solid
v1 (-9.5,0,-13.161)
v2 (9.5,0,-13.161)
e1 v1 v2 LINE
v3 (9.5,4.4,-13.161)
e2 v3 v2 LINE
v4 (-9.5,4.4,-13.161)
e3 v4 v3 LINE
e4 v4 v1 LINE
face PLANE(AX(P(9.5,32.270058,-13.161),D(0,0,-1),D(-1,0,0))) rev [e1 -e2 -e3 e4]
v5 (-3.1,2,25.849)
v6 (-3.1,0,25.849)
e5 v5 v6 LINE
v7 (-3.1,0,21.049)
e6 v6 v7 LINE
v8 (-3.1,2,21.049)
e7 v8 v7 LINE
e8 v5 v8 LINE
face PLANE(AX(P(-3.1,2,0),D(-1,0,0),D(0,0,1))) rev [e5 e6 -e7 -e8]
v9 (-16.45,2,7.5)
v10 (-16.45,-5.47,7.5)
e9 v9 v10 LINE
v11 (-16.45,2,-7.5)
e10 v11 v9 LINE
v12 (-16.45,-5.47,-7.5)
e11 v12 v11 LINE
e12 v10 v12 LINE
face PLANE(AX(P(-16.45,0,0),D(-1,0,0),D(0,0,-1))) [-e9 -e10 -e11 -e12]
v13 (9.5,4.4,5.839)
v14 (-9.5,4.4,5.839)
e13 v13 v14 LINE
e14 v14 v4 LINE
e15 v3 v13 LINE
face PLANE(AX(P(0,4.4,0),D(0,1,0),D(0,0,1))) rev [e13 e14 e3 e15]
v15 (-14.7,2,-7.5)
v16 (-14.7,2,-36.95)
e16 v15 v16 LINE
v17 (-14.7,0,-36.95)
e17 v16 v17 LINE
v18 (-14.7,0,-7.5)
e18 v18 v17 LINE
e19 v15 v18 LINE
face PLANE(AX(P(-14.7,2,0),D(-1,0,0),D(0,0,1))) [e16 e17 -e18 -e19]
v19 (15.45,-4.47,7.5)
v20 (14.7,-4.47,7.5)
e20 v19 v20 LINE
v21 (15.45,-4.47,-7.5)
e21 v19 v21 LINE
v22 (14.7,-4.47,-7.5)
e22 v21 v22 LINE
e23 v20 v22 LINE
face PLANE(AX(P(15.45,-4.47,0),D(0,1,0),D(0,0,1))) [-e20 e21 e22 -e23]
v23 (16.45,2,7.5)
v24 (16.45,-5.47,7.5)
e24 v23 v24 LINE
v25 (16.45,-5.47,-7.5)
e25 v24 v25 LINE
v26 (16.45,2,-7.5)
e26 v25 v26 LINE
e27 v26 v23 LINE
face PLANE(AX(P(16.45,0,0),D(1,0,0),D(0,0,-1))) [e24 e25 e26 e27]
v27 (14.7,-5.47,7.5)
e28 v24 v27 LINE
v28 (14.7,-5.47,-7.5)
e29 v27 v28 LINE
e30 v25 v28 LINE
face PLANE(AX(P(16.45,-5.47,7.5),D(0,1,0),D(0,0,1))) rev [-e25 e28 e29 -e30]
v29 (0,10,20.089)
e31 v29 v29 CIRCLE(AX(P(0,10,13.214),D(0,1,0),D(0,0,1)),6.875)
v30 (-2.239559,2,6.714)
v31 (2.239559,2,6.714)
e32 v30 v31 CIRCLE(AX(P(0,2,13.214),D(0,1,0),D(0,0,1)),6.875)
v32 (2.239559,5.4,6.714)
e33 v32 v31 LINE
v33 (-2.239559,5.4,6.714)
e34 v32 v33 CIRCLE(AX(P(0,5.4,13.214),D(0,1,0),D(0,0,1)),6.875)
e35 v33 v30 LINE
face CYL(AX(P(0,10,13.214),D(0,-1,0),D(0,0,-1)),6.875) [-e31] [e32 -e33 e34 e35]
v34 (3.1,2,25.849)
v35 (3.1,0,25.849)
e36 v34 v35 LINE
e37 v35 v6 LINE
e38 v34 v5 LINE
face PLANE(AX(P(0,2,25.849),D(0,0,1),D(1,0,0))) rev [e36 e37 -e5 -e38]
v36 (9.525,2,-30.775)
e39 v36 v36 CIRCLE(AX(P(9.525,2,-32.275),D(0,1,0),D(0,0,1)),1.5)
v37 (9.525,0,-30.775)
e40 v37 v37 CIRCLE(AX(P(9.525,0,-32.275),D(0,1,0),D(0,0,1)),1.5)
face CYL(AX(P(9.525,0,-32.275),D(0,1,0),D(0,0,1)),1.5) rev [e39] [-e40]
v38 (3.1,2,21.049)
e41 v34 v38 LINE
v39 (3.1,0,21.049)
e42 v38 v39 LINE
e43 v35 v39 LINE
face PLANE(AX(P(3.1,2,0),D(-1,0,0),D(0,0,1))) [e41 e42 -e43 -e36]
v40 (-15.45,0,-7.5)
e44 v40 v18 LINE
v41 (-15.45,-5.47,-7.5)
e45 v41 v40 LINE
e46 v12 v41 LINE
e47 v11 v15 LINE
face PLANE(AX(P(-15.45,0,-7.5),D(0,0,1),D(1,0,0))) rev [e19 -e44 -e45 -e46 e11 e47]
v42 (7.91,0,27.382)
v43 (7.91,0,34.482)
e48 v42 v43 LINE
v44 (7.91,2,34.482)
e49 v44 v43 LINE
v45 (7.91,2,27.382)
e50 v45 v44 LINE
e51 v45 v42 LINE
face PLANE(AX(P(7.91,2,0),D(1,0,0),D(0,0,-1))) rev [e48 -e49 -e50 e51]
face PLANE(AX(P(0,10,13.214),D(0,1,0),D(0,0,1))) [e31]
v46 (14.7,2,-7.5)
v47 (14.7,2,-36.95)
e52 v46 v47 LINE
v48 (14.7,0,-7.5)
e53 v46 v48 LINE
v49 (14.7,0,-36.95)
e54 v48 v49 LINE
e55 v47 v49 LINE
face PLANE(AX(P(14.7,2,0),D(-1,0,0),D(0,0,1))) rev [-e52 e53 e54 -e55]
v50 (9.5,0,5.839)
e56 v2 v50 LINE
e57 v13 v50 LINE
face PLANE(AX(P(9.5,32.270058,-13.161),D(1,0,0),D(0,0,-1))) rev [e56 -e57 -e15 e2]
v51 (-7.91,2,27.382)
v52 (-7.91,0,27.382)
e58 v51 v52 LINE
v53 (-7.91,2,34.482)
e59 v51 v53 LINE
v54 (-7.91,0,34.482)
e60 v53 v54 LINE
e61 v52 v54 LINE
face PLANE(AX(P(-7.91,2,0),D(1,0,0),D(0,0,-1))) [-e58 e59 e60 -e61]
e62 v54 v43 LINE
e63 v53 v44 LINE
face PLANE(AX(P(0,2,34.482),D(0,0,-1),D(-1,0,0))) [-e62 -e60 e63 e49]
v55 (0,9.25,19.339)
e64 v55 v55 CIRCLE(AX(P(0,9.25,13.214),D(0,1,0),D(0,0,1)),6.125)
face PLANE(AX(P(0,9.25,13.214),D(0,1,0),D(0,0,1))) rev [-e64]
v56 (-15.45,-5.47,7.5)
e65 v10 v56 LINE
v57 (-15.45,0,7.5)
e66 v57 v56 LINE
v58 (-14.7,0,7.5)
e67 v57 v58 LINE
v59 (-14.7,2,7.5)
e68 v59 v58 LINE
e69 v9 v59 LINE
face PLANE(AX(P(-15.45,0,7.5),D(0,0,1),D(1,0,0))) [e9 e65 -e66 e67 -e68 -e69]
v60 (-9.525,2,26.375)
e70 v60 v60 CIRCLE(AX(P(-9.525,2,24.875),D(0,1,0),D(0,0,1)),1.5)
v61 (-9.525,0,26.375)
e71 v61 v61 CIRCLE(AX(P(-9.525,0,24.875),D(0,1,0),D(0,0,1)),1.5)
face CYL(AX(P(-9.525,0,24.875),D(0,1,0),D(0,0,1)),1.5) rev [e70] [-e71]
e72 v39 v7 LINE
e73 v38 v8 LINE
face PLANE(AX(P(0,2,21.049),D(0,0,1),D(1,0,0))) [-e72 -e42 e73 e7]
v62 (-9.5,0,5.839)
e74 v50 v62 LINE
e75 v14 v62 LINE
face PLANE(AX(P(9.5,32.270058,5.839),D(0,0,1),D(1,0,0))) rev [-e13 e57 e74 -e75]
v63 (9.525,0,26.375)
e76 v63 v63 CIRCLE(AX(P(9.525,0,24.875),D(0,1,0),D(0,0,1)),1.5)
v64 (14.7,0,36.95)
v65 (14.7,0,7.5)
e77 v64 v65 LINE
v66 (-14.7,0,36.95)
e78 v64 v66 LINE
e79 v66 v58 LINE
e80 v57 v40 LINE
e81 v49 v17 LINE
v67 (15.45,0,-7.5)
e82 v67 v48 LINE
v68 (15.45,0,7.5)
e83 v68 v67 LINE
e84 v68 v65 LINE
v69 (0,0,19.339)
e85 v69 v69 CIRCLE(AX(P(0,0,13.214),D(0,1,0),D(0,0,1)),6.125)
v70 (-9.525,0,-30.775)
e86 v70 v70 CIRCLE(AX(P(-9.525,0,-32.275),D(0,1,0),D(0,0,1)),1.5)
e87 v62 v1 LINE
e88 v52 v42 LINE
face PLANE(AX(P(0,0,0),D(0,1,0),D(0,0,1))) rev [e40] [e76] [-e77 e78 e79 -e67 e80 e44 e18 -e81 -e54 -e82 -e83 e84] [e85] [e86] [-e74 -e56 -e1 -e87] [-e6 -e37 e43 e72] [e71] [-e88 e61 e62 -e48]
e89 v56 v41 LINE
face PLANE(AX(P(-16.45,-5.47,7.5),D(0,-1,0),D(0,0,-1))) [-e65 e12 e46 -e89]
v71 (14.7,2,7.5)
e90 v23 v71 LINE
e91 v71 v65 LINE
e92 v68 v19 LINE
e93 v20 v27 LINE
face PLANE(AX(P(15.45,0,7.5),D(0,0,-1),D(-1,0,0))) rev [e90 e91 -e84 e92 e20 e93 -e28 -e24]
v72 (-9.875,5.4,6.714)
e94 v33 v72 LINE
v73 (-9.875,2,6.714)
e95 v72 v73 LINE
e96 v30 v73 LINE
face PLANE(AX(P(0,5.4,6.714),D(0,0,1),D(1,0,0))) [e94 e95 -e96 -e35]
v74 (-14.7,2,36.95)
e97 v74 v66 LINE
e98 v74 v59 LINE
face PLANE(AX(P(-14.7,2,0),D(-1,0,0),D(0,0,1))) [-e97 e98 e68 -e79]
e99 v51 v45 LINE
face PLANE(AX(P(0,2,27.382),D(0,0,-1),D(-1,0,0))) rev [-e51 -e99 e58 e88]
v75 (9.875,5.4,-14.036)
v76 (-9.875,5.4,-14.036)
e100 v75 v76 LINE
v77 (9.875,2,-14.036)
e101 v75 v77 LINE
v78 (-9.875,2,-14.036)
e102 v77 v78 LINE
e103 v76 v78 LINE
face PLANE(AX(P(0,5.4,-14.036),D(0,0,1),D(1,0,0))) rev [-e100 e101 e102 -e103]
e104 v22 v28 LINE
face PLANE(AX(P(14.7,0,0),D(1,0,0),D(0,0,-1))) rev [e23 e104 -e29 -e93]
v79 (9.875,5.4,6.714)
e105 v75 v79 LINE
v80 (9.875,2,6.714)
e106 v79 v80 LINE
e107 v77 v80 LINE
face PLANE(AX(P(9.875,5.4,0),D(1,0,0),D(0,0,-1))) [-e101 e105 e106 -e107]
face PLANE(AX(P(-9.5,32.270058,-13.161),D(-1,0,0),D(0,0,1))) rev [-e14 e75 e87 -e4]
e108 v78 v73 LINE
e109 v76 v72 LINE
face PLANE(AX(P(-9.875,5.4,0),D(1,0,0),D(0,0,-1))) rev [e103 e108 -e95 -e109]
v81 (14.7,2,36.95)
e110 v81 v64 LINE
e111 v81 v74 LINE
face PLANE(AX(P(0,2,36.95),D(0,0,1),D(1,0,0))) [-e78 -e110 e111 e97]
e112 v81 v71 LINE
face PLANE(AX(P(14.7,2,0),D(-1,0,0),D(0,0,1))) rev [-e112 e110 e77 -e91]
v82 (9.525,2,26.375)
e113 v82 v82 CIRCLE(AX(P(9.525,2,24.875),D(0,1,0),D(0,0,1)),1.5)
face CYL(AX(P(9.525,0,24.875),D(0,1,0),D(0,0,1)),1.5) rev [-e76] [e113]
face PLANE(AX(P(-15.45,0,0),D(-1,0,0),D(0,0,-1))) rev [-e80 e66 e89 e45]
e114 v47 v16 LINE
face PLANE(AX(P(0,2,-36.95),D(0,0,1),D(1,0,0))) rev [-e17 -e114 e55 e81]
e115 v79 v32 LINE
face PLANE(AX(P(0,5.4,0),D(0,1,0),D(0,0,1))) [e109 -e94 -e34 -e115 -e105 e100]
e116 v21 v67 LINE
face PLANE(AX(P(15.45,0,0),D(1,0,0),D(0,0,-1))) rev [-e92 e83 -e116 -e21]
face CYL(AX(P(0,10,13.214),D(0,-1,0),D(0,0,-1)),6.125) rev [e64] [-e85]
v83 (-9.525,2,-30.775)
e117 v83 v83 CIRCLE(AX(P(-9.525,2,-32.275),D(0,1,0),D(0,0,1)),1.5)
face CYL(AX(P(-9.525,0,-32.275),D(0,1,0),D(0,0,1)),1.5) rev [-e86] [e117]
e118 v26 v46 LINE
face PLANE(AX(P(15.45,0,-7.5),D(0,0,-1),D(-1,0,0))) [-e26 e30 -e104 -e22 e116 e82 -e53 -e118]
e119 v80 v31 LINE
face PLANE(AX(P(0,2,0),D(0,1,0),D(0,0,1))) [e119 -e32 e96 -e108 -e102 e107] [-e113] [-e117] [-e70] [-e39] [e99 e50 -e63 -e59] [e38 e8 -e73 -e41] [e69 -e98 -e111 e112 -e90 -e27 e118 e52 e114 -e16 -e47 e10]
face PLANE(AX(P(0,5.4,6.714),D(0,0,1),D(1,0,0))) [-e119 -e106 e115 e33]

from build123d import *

# Parameters (mm, degrees)
SKETCH1_W               = 29.4
SKETCH1_H               = 73.9
SKETCH1_W_2             = 15.82
SKETCH1_H_2             = 7.1
SKETCH1_W_3             = 6.2
SKETCH1_H_3             = 4.8
BOSS_EXTRUDE1_DEPTH     = 2
SKETCH1_3_R             = 6.875
BOSS_EXTRUDE2_DEPTH     = 10
SHELL1_T                = -0.75
SKETCH1_4_W             = 19.75
SKETCH1_4_H             = 20.75
BOSS_EXTRUDE3_DEPTH     = 5.4
SKETCH2_W               = 19
SKETCH2_H               = 19
CUT_EXTRUDE1_DEPTH      = 4.4
CUT_EXTRUDE2_DEPTH      = 41.563437971
CUT_EXTRUDE2_DEPTH_BACK = 41.563437971
SKETCH5_W               = 15
SKETCH5_H               = 1
SKETCH5_W_2             = 7.5
SKETCH5_H_2             = 2
BOSS_EXTRUDE4_DEPTH     = 0.75
SKETCH6_W               = 15
SKETCH6_H               = 7.47
BOSS_EXTRUDE5_DEPTH     = 1
MIRROR1_START           = -7.5
MIRROR1_DEPTH           = 15


# Read off the part's stored shape, not the designer's step: Mirror1
with BuildPart() as part:
    # Sketch1 → Boss-Extrude1 (new body)
    with BuildSketch(Plane(origin=(0, 0, 0), x_dir=(1, 0, 0), z_dir=(0, 1, 0))):
        Rectangle(SKETCH1_W, SKETCH1_H)
        with Locations((0, -30.932)):
            Rectangle(SKETCH1_W_2, SKETCH1_H_2, mode=Mode.SUBTRACT)
        with Locations((0, -23.449)):
            Rectangle(SKETCH1_W_3, SKETCH1_H_3, mode=Mode.SUBTRACT)
        with BuildLine():
            Line((-9.875, 14.036), (9.875, 14.036))
            Line((9.875, 14.036), (9.875, -6.714))
            Line((9.875, -6.714), (2.239559108, -6.714))
            ThreePointArc((2.239559108, -6.714), (0, -20.089), (-2.239559108, -6.714))
            Line((-2.239559108, -6.714), (-9.875, -6.714))
            Line((-9.875, -6.714), (-9.875, 14.036))
        make_face(mode=Mode.SUBTRACT)
    extrude(amount=BOSS_EXTRUDE1_DEPTH)



with BuildPart() as body_2:
    # Sketch1<3> → Boss-Extrude2 (new body)
    with BuildSketch(Plane(origin=(0, 0, 0), x_dir=(1, 0, 0), z_dir=(0, 1, 0))):
        with Locations(Location((0, -13.214, 0), (0, 0, 270))):
            Circle(SKETCH1_3_R)
    extrude(amount=BOSS_EXTRUDE2_DEPTH)

    # Shell1
    shell1_openings = [body_2.faces().sort_by_distance(p)[0] for p in [
        (0, 0, 13.214),
    ]]
    offset(amount=SHELL1_T, openings=shell1_openings, kind=Kind.INTERSECTION)


with BuildPart() as part_1:
    add(part.part)

    add(body_2.part)  # Boss-Extrude3 merges body 2
    # Sketch1<4> → Boss-Extrude3 (add)
    with BuildSketch(Plane(origin=(0, 0, 0), x_dir=(1, 0, 0), z_dir=(0, 1, 0))):
        with Locations((0, 3.661)):
            Rectangle(SKETCH1_4_W, SKETCH1_4_H)
    extrude(amount=BOSS_EXTRUDE3_DEPTH)

    # Sketch2 → Cut-Extrude1 (cut)
    with BuildSketch(Plane.XZ):
        with Locations((0, -3.661)):
            Rectangle(SKETCH2_W, SKETCH2_H)
    extrude(amount=-CUT_EXTRUDE1_DEPTH, mode=Mode.SUBTRACT)

    # Sketch3 → Cut-Extrude2 (cut, two sides: drawn at the far end of the back side and taken through both)
    with BuildSketch(Plane(origin=(0, 2, 0), x_dir=(1, 0, 0), z_dir=(0, 1, 0)).offset(-CUT_EXTRUDE2_DEPTH_BACK)):
        with BuildLine():
            Line((-9.525, 30.775), (-9.525, 32.275))
            Line((-9.525, 32.275), (-8.025, 32.275))
            ThreePointArc((-8.025, 32.275), (-10.585660172, 33.335660172), (-9.525, 30.775))
        make_face()
        with BuildLine():
            Line((-8.025, 32.275), (-9.525, 32.275))
            Line((-9.525, 32.275), (-9.525, 30.775))
            ThreePointArc((-9.525, 30.775), (-8.464339828, 31.214339828), (-8.025, 32.275))
        make_face()
        with BuildLine():
            ThreePointArc((11.025, 32.275), (9.525, 33.775), (8.025, 32.275))
            Line((8.025, 32.275), (9.525, 32.275))
            Line((9.525, 32.275), (9.525, 30.775))
            ThreePointArc((9.525, 30.775), (10.585660172, 31.214339828), (11.025, 32.275))
        make_face()
        with BuildLine():
            Line((9.525, 32.275), (8.025, 32.275))
            ThreePointArc((8.025, 32.275), (8.464339828, 31.214339828), (9.525, 30.775))
            Line((9.525, 30.775), (9.525, 32.275))
        make_face()
        with BuildLine():
            ThreePointArc((11.025, -24.875), (10.585660172, -23.814339828), (9.525, -23.375))
            Line((9.525, -23.375), (9.525, -24.875))
            Line((9.525, -24.875), (8.025, -24.875))
            ThreePointArc((8.025, -24.875), (9.525, -26.375), (11.025, -24.875))
        make_face()
        with BuildLine():
            Line((9.525, -24.875), (9.525, -23.375))
            ThreePointArc((9.525, -23.375), (8.464339828, -23.814339828), (8.025, -24.875))
            Line((8.025, -24.875), (9.525, -24.875))
        make_face()
        with BuildLine():
            ThreePointArc((-8.025, -24.875), (-8.464339828, -23.814339828), (-9.525, -23.375))
            Line((-9.525, -23.375), (-9.525, -24.875))
            Line((-9.525, -24.875), (-8.025, -24.875))
        make_face()
        with BuildLine():
            Line((-9.525, -24.875), (-9.525, -23.375))
            ThreePointArc((-9.525, -23.375), (-10.585660172, -25.935660172), (-8.025, -24.875))
            Line((-8.025, -24.875), (-9.525, -24.875))
        make_face()
    extrude(amount=CUT_EXTRUDE2_DEPTH + CUT_EXTRUDE2_DEPTH_BACK, mode=Mode.SUBTRACT)

    # Sketch5 → Boss-Extrude4 (add)
    with BuildSketch(Plane(origin=(14.7, 0, 0), x_dir=(0, 0, -1), z_dir=(1, 0, 0))):
        with Locations((0, -4.97)):
            Rectangle(SKETCH5_W, SKETCH5_H)
        with Locations((-3.75, 1)):
            Rectangle(SKETCH5_W_2, SKETCH5_H_2)
        with Locations((3.75, 1)):
            Rectangle(SKETCH5_W_2, SKETCH5_H_2)
    extrude(amount=BOSS_EXTRUDE4_DEPTH)


with BuildPart() as boss_extrude4_piece_1:
    # of the separate pieces the step leaves, piece 1, a body of its own (boss_extrude4_pieces)
    add(part_1.part.solids().sort_by_distance((-14.7, 0, 36.95))[0])



with BuildPart() as boss_extrude4_piece_2:
    # of the separate pieces the step leaves, piece 2, a body of its own (boss_extrude4_pieces)
    add(part_1.part.solids().sort_by_distance((14.7, -4.47, -7.5))[0])


with BuildPart() as boss_extrude4_piece_1_1:
    add(boss_extrude4_piece_1.part)

    add(boss_extrude4_piece_2.part)  # Boss-Extrude5 merges Boss-Extrude4 piece 2
    # Sketch6 → Boss-Extrude5 (add)
    with BuildSketch(Plane(origin=(15.45, 0, 0), x_dir=(0, 0, -1), z_dir=(1, 0, 0))):
        with Locations((0, -1.735)):
            Rectangle(SKETCH6_W, SKETCH6_H)
    extrude(amount=BOSS_EXTRUDE5_DEPTH)

    # Mirror1 outline → Mirror1 (add)
    with BuildSketch(Plane.XY.offset(MIRROR1_START)):
        Polygon((-16.45, 2), (-16.45, -5.47), (-15.45, -5.47), (-15.45, 0), (-14.7, 0), (-14.7, 2), align=None)
    extrude(amount=MIRROR1_DEPTH)


solid = boss_extrude4_piece_1_1.part
